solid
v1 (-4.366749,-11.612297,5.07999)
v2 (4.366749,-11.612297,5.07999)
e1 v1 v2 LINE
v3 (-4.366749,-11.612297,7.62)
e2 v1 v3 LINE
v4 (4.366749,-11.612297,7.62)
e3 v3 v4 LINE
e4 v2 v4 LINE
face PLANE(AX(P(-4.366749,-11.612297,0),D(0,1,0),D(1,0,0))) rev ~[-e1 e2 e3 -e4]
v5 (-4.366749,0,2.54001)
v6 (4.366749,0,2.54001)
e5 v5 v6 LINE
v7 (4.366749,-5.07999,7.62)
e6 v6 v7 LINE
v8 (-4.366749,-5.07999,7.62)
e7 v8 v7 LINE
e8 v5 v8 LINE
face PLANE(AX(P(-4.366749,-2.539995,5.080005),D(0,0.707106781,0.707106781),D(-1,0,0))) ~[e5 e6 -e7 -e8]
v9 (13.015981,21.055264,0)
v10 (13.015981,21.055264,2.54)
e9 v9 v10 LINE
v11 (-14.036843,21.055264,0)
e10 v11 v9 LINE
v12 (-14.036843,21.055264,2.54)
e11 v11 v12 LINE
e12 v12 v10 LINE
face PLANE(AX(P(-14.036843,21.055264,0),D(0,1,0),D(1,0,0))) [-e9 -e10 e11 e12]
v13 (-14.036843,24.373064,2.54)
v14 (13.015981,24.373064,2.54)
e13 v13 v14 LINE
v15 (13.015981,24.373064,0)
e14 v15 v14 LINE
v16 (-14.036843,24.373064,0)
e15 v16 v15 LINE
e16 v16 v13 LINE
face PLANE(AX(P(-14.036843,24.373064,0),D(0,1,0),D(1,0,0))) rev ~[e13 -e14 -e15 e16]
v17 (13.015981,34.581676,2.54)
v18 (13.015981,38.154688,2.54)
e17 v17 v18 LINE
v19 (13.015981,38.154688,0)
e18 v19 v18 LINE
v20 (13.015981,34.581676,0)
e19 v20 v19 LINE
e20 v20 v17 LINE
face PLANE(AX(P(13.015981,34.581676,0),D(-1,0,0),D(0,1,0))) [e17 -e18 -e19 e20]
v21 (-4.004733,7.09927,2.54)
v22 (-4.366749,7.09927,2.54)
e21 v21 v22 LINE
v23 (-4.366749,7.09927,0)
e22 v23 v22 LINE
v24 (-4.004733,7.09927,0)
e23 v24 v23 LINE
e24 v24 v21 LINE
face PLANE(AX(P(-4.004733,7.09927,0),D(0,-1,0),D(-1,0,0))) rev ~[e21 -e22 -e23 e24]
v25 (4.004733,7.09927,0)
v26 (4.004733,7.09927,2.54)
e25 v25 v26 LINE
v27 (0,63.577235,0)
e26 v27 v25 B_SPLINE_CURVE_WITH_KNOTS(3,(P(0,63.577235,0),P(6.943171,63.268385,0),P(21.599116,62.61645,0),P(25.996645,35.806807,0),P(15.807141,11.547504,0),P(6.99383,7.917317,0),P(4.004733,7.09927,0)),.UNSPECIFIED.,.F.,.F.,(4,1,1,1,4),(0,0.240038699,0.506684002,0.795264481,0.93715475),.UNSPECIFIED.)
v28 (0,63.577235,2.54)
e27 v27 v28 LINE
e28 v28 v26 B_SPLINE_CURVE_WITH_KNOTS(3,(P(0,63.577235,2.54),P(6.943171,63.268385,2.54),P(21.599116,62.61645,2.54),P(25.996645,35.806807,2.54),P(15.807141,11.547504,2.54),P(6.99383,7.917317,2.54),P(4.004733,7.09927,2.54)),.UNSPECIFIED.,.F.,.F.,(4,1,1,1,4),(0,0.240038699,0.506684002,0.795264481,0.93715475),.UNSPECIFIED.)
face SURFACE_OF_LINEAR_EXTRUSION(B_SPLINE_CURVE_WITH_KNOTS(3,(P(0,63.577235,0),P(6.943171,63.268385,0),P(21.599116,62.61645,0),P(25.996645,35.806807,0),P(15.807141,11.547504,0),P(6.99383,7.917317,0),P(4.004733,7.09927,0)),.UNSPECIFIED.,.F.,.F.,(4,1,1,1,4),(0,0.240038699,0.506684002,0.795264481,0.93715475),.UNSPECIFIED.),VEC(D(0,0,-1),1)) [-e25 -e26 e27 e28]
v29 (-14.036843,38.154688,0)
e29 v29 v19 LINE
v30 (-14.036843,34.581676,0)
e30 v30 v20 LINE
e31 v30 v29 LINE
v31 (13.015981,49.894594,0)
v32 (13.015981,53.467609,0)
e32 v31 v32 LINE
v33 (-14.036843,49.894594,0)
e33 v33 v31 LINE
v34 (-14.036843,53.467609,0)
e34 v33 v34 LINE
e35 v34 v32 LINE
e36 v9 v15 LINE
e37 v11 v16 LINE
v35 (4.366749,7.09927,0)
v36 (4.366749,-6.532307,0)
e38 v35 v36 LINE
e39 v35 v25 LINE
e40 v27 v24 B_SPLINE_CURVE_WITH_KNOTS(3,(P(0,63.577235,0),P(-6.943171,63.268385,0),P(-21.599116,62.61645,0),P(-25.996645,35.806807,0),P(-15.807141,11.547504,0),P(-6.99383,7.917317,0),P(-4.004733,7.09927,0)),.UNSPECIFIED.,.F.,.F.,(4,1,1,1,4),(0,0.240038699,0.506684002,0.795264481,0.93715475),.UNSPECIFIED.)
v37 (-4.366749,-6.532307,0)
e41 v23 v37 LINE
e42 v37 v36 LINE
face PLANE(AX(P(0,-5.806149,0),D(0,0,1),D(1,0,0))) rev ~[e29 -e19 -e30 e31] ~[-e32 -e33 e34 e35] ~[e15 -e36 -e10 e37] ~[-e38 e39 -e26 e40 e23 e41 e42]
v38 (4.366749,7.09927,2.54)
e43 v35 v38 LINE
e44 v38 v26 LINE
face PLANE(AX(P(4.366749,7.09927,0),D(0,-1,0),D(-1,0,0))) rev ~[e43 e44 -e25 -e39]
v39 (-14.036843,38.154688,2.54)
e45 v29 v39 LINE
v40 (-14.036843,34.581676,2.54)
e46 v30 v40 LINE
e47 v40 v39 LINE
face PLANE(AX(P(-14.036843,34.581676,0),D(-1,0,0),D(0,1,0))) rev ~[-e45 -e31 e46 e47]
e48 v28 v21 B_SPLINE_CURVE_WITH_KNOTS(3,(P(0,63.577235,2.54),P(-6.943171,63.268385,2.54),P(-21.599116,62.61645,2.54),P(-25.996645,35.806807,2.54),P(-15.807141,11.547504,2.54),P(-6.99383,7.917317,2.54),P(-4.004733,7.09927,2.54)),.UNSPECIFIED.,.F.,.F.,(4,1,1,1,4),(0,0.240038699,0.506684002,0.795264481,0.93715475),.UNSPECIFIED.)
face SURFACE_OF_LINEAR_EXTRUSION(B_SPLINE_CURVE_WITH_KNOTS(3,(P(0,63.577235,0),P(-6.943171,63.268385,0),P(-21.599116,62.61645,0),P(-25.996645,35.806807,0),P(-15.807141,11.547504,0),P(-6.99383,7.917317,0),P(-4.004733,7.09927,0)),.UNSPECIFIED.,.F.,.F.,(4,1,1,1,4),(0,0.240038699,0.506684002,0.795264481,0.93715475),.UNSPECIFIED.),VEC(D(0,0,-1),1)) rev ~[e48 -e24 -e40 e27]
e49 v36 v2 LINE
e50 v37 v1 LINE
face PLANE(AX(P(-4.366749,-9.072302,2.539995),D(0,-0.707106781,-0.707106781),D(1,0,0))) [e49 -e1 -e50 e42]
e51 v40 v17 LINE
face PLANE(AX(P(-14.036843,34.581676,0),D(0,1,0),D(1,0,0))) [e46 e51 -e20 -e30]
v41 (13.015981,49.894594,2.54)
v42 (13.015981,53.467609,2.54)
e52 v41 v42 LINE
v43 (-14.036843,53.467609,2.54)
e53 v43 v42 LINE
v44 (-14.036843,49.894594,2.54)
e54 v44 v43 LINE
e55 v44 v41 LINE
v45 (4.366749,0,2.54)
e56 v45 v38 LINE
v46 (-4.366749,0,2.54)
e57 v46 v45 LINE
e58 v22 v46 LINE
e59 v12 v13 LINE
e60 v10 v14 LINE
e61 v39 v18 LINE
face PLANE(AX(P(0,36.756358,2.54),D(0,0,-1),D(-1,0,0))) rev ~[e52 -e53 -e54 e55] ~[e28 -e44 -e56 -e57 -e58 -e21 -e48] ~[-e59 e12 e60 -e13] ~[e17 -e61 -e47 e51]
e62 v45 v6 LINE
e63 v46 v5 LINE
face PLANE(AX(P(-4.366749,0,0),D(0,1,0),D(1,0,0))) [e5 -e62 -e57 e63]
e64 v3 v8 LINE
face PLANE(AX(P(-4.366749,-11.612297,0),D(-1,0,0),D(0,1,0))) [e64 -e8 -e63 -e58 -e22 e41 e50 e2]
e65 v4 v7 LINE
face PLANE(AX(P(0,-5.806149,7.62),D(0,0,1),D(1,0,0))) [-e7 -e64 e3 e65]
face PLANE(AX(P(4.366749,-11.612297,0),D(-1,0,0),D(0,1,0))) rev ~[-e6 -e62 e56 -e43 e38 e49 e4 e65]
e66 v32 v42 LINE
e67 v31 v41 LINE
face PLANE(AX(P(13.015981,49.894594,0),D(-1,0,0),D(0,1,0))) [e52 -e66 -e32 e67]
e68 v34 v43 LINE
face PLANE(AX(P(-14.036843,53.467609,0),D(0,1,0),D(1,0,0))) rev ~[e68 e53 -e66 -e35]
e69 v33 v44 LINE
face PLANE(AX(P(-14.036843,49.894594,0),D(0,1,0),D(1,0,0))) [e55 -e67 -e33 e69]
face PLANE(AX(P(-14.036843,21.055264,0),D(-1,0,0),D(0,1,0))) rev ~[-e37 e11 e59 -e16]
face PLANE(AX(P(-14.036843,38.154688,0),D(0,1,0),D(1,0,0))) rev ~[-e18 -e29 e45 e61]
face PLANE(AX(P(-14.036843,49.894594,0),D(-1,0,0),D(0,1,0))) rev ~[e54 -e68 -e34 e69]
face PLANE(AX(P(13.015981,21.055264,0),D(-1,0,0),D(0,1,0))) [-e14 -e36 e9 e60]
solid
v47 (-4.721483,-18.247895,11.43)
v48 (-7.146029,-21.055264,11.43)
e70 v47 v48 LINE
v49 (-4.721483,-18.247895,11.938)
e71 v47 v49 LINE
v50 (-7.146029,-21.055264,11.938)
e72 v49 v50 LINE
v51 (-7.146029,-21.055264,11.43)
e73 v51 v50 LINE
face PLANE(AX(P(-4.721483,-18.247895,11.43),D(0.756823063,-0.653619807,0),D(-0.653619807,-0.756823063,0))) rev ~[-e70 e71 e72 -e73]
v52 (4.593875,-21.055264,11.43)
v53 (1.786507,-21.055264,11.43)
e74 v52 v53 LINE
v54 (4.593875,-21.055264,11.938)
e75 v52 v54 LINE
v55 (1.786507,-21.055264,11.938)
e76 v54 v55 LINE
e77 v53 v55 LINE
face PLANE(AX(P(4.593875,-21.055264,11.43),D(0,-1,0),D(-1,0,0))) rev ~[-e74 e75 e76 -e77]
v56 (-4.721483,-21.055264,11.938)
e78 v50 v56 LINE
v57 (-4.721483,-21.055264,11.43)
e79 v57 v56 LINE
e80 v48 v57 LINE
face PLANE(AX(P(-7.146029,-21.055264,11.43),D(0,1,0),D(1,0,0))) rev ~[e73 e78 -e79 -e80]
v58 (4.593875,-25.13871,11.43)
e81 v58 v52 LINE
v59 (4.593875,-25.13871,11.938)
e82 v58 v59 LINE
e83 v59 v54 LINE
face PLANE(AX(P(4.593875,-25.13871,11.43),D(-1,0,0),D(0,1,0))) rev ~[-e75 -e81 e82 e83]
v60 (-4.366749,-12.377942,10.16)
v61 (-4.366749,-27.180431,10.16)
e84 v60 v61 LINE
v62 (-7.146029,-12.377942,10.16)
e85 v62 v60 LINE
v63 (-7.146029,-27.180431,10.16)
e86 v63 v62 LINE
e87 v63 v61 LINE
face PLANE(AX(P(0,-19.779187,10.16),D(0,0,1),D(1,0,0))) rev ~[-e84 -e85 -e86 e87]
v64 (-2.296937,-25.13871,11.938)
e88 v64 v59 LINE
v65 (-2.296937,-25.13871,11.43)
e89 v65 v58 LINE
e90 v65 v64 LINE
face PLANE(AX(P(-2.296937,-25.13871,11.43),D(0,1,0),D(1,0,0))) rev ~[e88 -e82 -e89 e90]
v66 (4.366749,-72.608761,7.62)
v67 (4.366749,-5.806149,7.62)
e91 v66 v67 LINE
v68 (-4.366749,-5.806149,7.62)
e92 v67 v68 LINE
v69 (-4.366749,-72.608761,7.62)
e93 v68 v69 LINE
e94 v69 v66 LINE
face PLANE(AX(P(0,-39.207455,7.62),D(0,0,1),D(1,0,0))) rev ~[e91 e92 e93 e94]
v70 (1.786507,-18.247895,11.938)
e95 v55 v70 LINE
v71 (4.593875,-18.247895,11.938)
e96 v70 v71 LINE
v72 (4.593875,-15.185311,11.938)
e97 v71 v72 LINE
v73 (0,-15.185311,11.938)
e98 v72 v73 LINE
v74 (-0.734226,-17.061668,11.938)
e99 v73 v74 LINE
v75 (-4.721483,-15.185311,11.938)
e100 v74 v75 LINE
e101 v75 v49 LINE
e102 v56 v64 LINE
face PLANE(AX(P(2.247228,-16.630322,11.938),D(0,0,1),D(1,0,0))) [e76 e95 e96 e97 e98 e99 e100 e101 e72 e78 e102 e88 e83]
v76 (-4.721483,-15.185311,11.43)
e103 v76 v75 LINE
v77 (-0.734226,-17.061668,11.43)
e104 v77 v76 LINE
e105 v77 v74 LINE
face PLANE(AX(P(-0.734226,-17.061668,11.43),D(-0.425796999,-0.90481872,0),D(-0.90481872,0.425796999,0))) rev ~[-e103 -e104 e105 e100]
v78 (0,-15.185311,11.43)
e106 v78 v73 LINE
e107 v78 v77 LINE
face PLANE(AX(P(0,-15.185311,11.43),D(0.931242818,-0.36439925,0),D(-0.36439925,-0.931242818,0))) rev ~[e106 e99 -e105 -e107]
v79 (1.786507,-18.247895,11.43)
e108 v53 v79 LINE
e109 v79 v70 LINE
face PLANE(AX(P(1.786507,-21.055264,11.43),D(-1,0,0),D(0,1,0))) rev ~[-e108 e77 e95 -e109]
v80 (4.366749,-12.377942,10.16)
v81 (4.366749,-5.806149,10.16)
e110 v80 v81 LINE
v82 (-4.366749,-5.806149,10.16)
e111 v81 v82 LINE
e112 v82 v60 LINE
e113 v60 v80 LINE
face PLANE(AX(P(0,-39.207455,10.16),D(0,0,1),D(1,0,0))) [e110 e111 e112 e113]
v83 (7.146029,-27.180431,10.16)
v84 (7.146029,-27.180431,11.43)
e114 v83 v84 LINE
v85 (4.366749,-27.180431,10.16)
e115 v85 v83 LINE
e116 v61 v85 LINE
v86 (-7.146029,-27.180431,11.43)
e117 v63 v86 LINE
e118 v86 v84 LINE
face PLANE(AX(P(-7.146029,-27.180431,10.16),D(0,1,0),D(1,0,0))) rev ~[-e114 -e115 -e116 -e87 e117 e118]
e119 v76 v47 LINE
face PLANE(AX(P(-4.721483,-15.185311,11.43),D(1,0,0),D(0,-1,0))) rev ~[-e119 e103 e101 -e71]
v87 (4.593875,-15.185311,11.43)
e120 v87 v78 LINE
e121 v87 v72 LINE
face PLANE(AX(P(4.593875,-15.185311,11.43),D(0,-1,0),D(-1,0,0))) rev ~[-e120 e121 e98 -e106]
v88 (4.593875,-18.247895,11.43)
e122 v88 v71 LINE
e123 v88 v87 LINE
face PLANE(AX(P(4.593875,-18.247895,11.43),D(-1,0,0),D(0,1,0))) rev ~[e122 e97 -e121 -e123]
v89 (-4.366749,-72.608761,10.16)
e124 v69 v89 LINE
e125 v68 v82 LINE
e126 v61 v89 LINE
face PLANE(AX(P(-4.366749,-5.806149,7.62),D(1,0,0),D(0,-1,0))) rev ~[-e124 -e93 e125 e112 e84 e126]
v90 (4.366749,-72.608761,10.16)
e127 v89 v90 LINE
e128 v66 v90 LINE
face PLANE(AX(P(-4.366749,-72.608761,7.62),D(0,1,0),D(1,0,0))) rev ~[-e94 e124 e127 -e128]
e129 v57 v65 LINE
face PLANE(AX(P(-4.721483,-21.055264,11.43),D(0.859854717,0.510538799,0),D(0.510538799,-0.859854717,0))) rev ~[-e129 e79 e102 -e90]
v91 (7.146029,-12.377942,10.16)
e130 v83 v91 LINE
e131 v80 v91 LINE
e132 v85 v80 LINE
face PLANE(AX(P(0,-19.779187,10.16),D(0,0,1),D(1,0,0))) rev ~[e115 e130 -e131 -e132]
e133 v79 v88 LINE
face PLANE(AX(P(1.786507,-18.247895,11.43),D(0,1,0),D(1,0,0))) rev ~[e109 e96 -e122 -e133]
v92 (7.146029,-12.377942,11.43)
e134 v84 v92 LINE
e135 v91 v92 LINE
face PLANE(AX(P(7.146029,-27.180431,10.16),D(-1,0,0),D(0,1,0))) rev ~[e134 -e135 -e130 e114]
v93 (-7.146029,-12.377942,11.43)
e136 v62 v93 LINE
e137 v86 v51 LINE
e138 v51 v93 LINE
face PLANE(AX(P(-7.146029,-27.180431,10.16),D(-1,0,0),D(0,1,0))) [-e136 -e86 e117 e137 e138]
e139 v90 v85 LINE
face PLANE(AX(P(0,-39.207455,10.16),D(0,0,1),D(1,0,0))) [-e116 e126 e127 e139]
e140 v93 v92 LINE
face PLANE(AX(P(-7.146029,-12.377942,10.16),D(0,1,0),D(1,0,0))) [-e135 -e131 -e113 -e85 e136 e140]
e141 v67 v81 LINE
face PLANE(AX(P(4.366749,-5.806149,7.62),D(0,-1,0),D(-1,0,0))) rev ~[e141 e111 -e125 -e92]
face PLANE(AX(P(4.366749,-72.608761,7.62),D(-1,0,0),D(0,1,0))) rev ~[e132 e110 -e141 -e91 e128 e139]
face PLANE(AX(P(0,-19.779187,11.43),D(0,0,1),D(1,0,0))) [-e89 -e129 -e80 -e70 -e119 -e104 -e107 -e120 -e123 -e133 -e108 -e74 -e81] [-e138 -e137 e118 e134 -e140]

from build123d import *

# Parameters (mm, degrees)
F0_W     = 27.0528234541
F0_H     = 3.3177994192
F0_H_2   = 3.5730116069
F0_H_3   = 3.5730153322
F1_DEPTH = 2.54
F0_W_2   = 8.7334977924
F0_H_4   = 11.6122970358
F2_DEPTH = 7.62
F4_DEPTH = 2.54
F5_SIZE  = 5.07999
F6_W     = 14.2920585349
F6_H     = 14.8024894297
F7_DEPTH = 1.27
F9_DEPTH = 0.508


# Not quite as in the source:
# - a fillet or chamfer is up to 0.001 mm smaller than in the source, because OpenCascade refuses the exact size


with BuildPart() as f1:
    # F0 (on Top) → F1 (new body)
    with BuildSketch(Plane.XY):
        with BuildLine():
            add(Edge.make_bspline(
                [(0, 63.577234745), (6.943171273, 63.2683845738), (21.5991155841, 62.6164503593), (25.9966448984, 35.8068070443), (15.8071406297, 11.5475044882), (6.9938303995, 7.9173166599), (4.0047332195, 7.0992700308)],
                knots=[0, 0, 0, 0, 0.2400386989, 0.5066840016, 0.7952644813, 0.9371547504, 0.9371547504, 0.9371547504, 0.9371547504], degree=3))
            add(Edge.make_bspline(
                [(0, 63.577234745), (-6.943171273, 63.2683845738), (-21.5991155841, 62.6164503593), (-25.9966448984, 35.8068070443), (-15.8071406297, 11.5475044882), (-6.9938303995, 7.9173166599), (-4.0047332195, 7.0992700308)],
                knots=[0, 0, 0, 0, 0.2400386989, 0.5066840016, 0.7952644813, 0.9371547504, 0.9371547504, 0.9371547504, 0.9371547504], degree=3))
            Line((-4.0047332195, 7.0992700308), (4.0047332195, 7.0992700308))
        make_face()
        with Locations((-0.5104308948, 22.714164108)):
            Rectangle(F0_W, F0_H, mode=Mode.SUBTRACT)
        with Locations((-0.5104308948, 36.368181929)):
            Rectangle(F0_W, F0_H_2, mode=Mode.SUBTRACT)
        with Locations((-0.5104308948, 51.6811013222)):
            Rectangle(F0_W, F0_H_3, mode=Mode.SUBTRACT)
        with BuildLine():
            Line((4.0047332195, 7.0992700308), (-4.0047332195, 7.0992700308))
            add(Edge.make_bspline(
                [(-4.0047332195, 7.0992700308), (-2.6808189042, 6.736945363), (-1.3404094521, 6.4488768122), (0, 6.1608082615)],
                knots=[0.9371547504, 0.9371547504, 0.9371547504, 0.9371547504, 1, 1, 1, 1], degree=3))
            add(Edge.make_bspline(
                [(4.0047332195, 7.0992700308), (2.6808189042, 6.736945363), (1.3404094521, 6.4488768122), (0, 6.1608082615)],
                knots=[0.9371547504, 0.9371547504, 0.9371547504, 0.9371547504, 1, 1, 1, 1], degree=3))
        make_face()
        with BuildLine():
            add(Edge.make_bspline(
                [(-4.0047332195, 7.0992700308), (-2.6808189042, 6.736945363), (-1.3404094521, 6.4488768122), (0, 6.1608082615)],
                knots=[0.9371547504, 0.9371547504, 0.9371547504, 0.9371547504, 1, 1, 1, 1], degree=3))
            Line((-4.0047332195, 7.0992700308), (-4.3667488962, 7.0992700308))
            Line((-4.3667488962, 7.0992700308), (-4.3667488962, 0))
            Line((-4.3667488962, 0), (4.3667488962, 0))
            Line((4.3667488962, 0), (4.3667488962, 7.0992700308))
            Line((4.3667488962, 7.0992700308), (4.0047332195, 7.0992700308))
            add(Edge.make_bspline(
                [(4.0047332195, 7.0992700308), (2.6808189042, 6.736945363), (1.3404094521, 6.4488768122), (0, 6.1608082615)],
                knots=[0.9371547504, 0.9371547504, 0.9371547504, 0.9371547504, 1, 1, 1, 1], degree=3))
        make_face()
    extrude(amount=F1_DEPTH)

    # F0 (on Top) → F2 (join)
    with BuildSketch(Plane.XY):
        with Locations((0, -5.8061485179)):
            Rectangle(F0_W_2, F0_H_4)
    extrude(amount=F2_DEPTH)

    # F5 (size 5.08 in the source; OpenCascade refuses exactly that, so slightly less here)
    f5_edges = [f1.edges().sort_by_distance(p)[0] for p in [
        (0, -11.612297, 0),
        (0, 0, 7.62),
    ]]
    chamfer(f5_edges, length=F5_SIZE)


with BuildPart() as f4:
    # F3 (on face) → F4 (new body)
    with BuildSketch(Plane.XY.offset(7.62)):
        Polygon((4.3667488962, -5.8061485179), (-4.3667488962, -5.8061485179), (-4.3667488962, -72.6087614894), (4.3667488962, -72.6087614894), (4.3667488962, -70.3118219972), align=None)
    extrude(amount=F4_DEPTH)

    # F6 (on face) → F7 (join)
    with BuildSketch(Plane.XY.offset(10.16)):
        with Locations((0, -19.7791866958)):
            Rectangle(F6_W, F6_H)
    extrude(amount=F7_DEPTH)

    # F8 (on face) → F9 (join)
    with BuildSketch(Plane.XY.offset(11.43)):
        Polygon((4.5938747935, -15.1853114367), (0, -15.1853114367), (-0.7342260891, -17.0616675849), (1.7865073169, -18.2478949428), (4.5938747935, -18.2478949428), align=None)
        Polygon((-2.2969373967, -21.0552643985), (-0.7342260891, -17.0616675849), (-4.7214833321, -15.1853114367), (-4.7214833321, -18.2478949428), (-7.1460292675, -21.0552643985), (-4.7214833321, -21.0552643985), align=None)
        Polygon((1.7865073169, -18.2478949428), (-0.7342260891, -17.0616675849), (-2.2969373967, -21.0552643985), (4.5938747935, -25.1387096941), (4.5938747935, -21.0552643985), (1.7865073169, -21.0552643985), align=None)
        Polygon((4.5938747935, -25.1387096941), (-2.2969373967, -21.0552643985), (-2.2969373967, -25.1387096941), align=None)
        Polygon((-2.2969373967, -25.1387096941), (-2.2969373967, -21.0552643985), (-4.7214833321, -21.0552643985), align=None)
    extrude(amount=F9_DEPTH)


solid = Compound([f1.part, f4.part])
